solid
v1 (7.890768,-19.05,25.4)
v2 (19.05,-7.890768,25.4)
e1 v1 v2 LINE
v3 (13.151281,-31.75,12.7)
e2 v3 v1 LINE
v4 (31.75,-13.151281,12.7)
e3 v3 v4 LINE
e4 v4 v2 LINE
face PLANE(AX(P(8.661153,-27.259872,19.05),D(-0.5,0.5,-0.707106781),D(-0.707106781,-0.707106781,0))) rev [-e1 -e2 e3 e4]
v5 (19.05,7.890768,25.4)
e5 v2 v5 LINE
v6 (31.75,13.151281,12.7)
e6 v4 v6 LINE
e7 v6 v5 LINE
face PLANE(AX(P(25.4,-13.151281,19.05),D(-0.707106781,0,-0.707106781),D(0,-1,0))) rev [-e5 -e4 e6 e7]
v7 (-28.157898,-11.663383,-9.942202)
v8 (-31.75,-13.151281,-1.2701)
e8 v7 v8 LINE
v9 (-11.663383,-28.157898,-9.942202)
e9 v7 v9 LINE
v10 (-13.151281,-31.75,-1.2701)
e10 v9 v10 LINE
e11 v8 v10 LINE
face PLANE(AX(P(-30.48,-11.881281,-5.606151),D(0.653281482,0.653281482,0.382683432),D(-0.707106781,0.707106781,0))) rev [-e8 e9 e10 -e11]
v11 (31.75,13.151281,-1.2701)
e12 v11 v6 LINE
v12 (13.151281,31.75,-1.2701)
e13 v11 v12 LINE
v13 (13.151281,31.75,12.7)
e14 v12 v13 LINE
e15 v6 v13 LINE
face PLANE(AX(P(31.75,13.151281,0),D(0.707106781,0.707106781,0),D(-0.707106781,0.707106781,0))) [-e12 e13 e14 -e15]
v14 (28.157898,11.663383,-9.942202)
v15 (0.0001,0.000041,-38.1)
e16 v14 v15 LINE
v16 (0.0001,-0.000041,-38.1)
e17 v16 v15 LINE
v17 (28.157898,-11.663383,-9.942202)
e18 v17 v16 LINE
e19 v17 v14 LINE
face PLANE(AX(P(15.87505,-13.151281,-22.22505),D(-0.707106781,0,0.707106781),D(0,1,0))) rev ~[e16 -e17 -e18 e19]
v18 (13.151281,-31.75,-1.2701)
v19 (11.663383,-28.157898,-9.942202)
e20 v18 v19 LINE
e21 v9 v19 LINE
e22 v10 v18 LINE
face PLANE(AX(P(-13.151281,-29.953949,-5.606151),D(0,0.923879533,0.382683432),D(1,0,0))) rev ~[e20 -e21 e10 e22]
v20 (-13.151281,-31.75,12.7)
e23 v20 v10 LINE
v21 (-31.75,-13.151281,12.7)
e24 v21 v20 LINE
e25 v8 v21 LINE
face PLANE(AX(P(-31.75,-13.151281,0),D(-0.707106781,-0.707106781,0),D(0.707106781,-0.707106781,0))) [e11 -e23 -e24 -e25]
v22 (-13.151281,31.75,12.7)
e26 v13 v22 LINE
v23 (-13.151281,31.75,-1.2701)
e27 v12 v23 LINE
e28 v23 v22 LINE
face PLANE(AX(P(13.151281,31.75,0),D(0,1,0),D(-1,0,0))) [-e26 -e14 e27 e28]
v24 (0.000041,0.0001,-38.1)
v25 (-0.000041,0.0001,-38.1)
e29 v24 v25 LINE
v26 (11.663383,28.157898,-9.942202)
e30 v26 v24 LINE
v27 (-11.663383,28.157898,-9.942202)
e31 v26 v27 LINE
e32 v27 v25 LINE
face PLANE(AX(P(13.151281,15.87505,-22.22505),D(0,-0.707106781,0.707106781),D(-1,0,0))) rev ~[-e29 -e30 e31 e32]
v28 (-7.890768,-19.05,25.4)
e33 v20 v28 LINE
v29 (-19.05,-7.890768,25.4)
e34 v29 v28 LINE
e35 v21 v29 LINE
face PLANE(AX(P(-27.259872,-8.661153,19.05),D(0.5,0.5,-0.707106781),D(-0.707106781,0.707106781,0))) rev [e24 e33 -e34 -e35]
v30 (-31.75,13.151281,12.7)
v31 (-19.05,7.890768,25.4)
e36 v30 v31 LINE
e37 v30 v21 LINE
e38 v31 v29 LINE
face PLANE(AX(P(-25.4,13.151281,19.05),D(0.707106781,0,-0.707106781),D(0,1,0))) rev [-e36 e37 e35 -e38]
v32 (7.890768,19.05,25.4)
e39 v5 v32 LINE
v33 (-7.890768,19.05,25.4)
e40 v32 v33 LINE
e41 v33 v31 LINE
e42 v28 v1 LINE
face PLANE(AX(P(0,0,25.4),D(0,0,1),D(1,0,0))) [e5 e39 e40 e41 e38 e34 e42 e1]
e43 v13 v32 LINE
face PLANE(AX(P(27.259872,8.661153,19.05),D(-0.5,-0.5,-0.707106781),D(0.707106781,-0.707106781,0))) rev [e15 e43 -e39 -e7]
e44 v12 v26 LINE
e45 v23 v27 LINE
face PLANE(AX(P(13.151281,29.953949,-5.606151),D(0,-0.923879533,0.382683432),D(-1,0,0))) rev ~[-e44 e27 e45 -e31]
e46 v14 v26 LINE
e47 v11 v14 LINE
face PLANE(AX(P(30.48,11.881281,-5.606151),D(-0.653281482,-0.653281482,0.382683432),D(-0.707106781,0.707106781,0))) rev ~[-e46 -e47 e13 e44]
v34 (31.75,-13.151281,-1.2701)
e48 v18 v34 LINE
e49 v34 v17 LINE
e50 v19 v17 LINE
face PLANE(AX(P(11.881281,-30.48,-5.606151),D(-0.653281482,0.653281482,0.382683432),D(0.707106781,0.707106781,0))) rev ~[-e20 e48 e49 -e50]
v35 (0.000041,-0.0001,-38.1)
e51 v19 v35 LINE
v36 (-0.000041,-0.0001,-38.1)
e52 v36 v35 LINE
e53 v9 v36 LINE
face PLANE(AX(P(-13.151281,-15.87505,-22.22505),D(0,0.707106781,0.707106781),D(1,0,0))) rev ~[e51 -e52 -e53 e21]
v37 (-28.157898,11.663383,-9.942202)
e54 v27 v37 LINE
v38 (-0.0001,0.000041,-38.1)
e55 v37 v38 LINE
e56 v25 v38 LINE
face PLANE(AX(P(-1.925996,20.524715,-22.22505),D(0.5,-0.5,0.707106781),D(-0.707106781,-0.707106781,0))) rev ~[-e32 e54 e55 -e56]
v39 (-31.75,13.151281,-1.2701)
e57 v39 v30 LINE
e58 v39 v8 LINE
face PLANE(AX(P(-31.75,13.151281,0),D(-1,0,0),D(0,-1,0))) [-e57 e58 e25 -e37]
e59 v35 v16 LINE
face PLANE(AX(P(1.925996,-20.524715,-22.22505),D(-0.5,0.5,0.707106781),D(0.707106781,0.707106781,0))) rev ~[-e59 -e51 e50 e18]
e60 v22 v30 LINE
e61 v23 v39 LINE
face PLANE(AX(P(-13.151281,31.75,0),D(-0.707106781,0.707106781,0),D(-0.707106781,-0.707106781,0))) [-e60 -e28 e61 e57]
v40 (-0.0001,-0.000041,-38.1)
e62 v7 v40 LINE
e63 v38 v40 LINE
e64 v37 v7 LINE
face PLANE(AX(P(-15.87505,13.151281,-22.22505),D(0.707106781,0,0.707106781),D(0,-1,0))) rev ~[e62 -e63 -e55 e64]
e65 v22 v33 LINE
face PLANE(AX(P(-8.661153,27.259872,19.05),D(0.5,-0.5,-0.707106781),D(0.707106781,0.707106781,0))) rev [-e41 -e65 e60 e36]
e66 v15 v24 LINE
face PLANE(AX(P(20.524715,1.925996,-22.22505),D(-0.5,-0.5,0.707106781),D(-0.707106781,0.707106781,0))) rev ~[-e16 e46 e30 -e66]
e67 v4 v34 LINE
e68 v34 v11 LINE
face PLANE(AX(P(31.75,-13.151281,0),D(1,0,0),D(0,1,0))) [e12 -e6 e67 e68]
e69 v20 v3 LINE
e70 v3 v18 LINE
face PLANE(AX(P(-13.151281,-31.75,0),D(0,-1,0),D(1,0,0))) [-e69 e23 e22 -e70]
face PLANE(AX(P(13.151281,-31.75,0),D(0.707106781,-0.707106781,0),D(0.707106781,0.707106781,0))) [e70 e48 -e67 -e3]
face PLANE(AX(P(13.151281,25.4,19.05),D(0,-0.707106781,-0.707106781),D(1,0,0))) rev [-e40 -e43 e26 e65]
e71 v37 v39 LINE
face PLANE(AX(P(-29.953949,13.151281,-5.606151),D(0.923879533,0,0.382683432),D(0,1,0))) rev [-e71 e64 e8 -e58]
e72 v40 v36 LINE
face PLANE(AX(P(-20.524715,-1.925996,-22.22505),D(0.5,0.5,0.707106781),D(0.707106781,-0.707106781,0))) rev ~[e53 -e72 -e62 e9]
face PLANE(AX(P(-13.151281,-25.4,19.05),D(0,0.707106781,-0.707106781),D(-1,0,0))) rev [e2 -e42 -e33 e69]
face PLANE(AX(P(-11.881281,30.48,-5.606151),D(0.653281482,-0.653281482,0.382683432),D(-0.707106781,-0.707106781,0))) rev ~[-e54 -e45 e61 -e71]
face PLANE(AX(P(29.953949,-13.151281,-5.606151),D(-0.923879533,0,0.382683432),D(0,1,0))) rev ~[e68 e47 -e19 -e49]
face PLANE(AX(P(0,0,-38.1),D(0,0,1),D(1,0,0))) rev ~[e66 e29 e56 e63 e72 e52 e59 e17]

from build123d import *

# Parameters (mm, degrees)
F1_DEPTH = 25.4
F2_SIZE  = 12.7
F3_DEPTH = 38.1
F4_SIZE  = 31.7499
F5_SIZE  = 5.08


# Not quite as in the source:
# - a fillet or chamfer is up to 0.001 mm smaller than in the source, because OpenCascade refuses the exact size


with BuildPart() as f1:
    # F0 (on Top) → F1 (new body)
    with BuildSketch(Plane.XY):
        Polygon((31.75, -13.1512806053), (31.75, 13.1512806053), (13.1512806053, 31.75), (-13.1512806053, 31.75), (-31.75, 13.1512806053), (-31.75, -13.1512806053), (-13.1512806053, -31.75), (13.1512806053, -31.75), align=None)
    extrude(amount=F1_DEPTH)

    # F2
    f2_edges = [f1.edges().sort_by_distance(p)[0] for p in [
        (-31.75, 0, 25.4),
        (-22.45064, -22.45064, 25.4),
        (0, -31.75, 25.4),
        (22.45064, -22.45064, 25.4),
        (31.75, 0, 25.4),
        (22.45064, 22.45064, 25.4),
        (0, 31.75, 25.4),
        (-22.45064, 22.45064, 25.4),
    ]]
    chamfer(f2_edges, length=F2_SIZE)

    # F3 (add): a face of the model
    f3_faces = [f1.faces().sort_by_distance(p)[0] for p in [
        (0, 0, 0),
    ]]
    extrude(f3_faces, amount=F3_DEPTH)

    # F4 (size 31.75 in the source; OpenCascade refuses exactly that, so slightly less here)
    f4_edges = [f1.edges().sort_by_distance(p)[0] for p in [
        (-22.45064, -22.45064, -38.1),
        (0, -31.75, -38.1),
        (22.45064, -22.45064, -38.1),
        (-31.75, 0, -38.1),
        (-22.45064, 22.45064, -38.1),
        (0, 31.75, -38.1),
        (22.45064, 22.45064, -38.1),
        (31.75, 0, -38.1),
    ]]
    chamfer(f4_edges, length=F4_SIZE)

    # F5
    f5_edges = [f1.edges().sort_by_distance(p)[0] for p in [
        (-31.75, 0, -6.3501),
        (-22.45064, 22.45064, -6.3501),
        (-22.45064, -22.45064, -6.3501),
        (0, -31.75, -6.3501),
        (22.45064, -22.45064, -6.3501),
        (31.75, 0, -6.3501),
        (22.45064, 22.45064, -6.3501),
        (0, 31.75, -6.3501),
    ]]
    chamfer(f5_edges, length=F5_SIZE)


solid = f1.part
